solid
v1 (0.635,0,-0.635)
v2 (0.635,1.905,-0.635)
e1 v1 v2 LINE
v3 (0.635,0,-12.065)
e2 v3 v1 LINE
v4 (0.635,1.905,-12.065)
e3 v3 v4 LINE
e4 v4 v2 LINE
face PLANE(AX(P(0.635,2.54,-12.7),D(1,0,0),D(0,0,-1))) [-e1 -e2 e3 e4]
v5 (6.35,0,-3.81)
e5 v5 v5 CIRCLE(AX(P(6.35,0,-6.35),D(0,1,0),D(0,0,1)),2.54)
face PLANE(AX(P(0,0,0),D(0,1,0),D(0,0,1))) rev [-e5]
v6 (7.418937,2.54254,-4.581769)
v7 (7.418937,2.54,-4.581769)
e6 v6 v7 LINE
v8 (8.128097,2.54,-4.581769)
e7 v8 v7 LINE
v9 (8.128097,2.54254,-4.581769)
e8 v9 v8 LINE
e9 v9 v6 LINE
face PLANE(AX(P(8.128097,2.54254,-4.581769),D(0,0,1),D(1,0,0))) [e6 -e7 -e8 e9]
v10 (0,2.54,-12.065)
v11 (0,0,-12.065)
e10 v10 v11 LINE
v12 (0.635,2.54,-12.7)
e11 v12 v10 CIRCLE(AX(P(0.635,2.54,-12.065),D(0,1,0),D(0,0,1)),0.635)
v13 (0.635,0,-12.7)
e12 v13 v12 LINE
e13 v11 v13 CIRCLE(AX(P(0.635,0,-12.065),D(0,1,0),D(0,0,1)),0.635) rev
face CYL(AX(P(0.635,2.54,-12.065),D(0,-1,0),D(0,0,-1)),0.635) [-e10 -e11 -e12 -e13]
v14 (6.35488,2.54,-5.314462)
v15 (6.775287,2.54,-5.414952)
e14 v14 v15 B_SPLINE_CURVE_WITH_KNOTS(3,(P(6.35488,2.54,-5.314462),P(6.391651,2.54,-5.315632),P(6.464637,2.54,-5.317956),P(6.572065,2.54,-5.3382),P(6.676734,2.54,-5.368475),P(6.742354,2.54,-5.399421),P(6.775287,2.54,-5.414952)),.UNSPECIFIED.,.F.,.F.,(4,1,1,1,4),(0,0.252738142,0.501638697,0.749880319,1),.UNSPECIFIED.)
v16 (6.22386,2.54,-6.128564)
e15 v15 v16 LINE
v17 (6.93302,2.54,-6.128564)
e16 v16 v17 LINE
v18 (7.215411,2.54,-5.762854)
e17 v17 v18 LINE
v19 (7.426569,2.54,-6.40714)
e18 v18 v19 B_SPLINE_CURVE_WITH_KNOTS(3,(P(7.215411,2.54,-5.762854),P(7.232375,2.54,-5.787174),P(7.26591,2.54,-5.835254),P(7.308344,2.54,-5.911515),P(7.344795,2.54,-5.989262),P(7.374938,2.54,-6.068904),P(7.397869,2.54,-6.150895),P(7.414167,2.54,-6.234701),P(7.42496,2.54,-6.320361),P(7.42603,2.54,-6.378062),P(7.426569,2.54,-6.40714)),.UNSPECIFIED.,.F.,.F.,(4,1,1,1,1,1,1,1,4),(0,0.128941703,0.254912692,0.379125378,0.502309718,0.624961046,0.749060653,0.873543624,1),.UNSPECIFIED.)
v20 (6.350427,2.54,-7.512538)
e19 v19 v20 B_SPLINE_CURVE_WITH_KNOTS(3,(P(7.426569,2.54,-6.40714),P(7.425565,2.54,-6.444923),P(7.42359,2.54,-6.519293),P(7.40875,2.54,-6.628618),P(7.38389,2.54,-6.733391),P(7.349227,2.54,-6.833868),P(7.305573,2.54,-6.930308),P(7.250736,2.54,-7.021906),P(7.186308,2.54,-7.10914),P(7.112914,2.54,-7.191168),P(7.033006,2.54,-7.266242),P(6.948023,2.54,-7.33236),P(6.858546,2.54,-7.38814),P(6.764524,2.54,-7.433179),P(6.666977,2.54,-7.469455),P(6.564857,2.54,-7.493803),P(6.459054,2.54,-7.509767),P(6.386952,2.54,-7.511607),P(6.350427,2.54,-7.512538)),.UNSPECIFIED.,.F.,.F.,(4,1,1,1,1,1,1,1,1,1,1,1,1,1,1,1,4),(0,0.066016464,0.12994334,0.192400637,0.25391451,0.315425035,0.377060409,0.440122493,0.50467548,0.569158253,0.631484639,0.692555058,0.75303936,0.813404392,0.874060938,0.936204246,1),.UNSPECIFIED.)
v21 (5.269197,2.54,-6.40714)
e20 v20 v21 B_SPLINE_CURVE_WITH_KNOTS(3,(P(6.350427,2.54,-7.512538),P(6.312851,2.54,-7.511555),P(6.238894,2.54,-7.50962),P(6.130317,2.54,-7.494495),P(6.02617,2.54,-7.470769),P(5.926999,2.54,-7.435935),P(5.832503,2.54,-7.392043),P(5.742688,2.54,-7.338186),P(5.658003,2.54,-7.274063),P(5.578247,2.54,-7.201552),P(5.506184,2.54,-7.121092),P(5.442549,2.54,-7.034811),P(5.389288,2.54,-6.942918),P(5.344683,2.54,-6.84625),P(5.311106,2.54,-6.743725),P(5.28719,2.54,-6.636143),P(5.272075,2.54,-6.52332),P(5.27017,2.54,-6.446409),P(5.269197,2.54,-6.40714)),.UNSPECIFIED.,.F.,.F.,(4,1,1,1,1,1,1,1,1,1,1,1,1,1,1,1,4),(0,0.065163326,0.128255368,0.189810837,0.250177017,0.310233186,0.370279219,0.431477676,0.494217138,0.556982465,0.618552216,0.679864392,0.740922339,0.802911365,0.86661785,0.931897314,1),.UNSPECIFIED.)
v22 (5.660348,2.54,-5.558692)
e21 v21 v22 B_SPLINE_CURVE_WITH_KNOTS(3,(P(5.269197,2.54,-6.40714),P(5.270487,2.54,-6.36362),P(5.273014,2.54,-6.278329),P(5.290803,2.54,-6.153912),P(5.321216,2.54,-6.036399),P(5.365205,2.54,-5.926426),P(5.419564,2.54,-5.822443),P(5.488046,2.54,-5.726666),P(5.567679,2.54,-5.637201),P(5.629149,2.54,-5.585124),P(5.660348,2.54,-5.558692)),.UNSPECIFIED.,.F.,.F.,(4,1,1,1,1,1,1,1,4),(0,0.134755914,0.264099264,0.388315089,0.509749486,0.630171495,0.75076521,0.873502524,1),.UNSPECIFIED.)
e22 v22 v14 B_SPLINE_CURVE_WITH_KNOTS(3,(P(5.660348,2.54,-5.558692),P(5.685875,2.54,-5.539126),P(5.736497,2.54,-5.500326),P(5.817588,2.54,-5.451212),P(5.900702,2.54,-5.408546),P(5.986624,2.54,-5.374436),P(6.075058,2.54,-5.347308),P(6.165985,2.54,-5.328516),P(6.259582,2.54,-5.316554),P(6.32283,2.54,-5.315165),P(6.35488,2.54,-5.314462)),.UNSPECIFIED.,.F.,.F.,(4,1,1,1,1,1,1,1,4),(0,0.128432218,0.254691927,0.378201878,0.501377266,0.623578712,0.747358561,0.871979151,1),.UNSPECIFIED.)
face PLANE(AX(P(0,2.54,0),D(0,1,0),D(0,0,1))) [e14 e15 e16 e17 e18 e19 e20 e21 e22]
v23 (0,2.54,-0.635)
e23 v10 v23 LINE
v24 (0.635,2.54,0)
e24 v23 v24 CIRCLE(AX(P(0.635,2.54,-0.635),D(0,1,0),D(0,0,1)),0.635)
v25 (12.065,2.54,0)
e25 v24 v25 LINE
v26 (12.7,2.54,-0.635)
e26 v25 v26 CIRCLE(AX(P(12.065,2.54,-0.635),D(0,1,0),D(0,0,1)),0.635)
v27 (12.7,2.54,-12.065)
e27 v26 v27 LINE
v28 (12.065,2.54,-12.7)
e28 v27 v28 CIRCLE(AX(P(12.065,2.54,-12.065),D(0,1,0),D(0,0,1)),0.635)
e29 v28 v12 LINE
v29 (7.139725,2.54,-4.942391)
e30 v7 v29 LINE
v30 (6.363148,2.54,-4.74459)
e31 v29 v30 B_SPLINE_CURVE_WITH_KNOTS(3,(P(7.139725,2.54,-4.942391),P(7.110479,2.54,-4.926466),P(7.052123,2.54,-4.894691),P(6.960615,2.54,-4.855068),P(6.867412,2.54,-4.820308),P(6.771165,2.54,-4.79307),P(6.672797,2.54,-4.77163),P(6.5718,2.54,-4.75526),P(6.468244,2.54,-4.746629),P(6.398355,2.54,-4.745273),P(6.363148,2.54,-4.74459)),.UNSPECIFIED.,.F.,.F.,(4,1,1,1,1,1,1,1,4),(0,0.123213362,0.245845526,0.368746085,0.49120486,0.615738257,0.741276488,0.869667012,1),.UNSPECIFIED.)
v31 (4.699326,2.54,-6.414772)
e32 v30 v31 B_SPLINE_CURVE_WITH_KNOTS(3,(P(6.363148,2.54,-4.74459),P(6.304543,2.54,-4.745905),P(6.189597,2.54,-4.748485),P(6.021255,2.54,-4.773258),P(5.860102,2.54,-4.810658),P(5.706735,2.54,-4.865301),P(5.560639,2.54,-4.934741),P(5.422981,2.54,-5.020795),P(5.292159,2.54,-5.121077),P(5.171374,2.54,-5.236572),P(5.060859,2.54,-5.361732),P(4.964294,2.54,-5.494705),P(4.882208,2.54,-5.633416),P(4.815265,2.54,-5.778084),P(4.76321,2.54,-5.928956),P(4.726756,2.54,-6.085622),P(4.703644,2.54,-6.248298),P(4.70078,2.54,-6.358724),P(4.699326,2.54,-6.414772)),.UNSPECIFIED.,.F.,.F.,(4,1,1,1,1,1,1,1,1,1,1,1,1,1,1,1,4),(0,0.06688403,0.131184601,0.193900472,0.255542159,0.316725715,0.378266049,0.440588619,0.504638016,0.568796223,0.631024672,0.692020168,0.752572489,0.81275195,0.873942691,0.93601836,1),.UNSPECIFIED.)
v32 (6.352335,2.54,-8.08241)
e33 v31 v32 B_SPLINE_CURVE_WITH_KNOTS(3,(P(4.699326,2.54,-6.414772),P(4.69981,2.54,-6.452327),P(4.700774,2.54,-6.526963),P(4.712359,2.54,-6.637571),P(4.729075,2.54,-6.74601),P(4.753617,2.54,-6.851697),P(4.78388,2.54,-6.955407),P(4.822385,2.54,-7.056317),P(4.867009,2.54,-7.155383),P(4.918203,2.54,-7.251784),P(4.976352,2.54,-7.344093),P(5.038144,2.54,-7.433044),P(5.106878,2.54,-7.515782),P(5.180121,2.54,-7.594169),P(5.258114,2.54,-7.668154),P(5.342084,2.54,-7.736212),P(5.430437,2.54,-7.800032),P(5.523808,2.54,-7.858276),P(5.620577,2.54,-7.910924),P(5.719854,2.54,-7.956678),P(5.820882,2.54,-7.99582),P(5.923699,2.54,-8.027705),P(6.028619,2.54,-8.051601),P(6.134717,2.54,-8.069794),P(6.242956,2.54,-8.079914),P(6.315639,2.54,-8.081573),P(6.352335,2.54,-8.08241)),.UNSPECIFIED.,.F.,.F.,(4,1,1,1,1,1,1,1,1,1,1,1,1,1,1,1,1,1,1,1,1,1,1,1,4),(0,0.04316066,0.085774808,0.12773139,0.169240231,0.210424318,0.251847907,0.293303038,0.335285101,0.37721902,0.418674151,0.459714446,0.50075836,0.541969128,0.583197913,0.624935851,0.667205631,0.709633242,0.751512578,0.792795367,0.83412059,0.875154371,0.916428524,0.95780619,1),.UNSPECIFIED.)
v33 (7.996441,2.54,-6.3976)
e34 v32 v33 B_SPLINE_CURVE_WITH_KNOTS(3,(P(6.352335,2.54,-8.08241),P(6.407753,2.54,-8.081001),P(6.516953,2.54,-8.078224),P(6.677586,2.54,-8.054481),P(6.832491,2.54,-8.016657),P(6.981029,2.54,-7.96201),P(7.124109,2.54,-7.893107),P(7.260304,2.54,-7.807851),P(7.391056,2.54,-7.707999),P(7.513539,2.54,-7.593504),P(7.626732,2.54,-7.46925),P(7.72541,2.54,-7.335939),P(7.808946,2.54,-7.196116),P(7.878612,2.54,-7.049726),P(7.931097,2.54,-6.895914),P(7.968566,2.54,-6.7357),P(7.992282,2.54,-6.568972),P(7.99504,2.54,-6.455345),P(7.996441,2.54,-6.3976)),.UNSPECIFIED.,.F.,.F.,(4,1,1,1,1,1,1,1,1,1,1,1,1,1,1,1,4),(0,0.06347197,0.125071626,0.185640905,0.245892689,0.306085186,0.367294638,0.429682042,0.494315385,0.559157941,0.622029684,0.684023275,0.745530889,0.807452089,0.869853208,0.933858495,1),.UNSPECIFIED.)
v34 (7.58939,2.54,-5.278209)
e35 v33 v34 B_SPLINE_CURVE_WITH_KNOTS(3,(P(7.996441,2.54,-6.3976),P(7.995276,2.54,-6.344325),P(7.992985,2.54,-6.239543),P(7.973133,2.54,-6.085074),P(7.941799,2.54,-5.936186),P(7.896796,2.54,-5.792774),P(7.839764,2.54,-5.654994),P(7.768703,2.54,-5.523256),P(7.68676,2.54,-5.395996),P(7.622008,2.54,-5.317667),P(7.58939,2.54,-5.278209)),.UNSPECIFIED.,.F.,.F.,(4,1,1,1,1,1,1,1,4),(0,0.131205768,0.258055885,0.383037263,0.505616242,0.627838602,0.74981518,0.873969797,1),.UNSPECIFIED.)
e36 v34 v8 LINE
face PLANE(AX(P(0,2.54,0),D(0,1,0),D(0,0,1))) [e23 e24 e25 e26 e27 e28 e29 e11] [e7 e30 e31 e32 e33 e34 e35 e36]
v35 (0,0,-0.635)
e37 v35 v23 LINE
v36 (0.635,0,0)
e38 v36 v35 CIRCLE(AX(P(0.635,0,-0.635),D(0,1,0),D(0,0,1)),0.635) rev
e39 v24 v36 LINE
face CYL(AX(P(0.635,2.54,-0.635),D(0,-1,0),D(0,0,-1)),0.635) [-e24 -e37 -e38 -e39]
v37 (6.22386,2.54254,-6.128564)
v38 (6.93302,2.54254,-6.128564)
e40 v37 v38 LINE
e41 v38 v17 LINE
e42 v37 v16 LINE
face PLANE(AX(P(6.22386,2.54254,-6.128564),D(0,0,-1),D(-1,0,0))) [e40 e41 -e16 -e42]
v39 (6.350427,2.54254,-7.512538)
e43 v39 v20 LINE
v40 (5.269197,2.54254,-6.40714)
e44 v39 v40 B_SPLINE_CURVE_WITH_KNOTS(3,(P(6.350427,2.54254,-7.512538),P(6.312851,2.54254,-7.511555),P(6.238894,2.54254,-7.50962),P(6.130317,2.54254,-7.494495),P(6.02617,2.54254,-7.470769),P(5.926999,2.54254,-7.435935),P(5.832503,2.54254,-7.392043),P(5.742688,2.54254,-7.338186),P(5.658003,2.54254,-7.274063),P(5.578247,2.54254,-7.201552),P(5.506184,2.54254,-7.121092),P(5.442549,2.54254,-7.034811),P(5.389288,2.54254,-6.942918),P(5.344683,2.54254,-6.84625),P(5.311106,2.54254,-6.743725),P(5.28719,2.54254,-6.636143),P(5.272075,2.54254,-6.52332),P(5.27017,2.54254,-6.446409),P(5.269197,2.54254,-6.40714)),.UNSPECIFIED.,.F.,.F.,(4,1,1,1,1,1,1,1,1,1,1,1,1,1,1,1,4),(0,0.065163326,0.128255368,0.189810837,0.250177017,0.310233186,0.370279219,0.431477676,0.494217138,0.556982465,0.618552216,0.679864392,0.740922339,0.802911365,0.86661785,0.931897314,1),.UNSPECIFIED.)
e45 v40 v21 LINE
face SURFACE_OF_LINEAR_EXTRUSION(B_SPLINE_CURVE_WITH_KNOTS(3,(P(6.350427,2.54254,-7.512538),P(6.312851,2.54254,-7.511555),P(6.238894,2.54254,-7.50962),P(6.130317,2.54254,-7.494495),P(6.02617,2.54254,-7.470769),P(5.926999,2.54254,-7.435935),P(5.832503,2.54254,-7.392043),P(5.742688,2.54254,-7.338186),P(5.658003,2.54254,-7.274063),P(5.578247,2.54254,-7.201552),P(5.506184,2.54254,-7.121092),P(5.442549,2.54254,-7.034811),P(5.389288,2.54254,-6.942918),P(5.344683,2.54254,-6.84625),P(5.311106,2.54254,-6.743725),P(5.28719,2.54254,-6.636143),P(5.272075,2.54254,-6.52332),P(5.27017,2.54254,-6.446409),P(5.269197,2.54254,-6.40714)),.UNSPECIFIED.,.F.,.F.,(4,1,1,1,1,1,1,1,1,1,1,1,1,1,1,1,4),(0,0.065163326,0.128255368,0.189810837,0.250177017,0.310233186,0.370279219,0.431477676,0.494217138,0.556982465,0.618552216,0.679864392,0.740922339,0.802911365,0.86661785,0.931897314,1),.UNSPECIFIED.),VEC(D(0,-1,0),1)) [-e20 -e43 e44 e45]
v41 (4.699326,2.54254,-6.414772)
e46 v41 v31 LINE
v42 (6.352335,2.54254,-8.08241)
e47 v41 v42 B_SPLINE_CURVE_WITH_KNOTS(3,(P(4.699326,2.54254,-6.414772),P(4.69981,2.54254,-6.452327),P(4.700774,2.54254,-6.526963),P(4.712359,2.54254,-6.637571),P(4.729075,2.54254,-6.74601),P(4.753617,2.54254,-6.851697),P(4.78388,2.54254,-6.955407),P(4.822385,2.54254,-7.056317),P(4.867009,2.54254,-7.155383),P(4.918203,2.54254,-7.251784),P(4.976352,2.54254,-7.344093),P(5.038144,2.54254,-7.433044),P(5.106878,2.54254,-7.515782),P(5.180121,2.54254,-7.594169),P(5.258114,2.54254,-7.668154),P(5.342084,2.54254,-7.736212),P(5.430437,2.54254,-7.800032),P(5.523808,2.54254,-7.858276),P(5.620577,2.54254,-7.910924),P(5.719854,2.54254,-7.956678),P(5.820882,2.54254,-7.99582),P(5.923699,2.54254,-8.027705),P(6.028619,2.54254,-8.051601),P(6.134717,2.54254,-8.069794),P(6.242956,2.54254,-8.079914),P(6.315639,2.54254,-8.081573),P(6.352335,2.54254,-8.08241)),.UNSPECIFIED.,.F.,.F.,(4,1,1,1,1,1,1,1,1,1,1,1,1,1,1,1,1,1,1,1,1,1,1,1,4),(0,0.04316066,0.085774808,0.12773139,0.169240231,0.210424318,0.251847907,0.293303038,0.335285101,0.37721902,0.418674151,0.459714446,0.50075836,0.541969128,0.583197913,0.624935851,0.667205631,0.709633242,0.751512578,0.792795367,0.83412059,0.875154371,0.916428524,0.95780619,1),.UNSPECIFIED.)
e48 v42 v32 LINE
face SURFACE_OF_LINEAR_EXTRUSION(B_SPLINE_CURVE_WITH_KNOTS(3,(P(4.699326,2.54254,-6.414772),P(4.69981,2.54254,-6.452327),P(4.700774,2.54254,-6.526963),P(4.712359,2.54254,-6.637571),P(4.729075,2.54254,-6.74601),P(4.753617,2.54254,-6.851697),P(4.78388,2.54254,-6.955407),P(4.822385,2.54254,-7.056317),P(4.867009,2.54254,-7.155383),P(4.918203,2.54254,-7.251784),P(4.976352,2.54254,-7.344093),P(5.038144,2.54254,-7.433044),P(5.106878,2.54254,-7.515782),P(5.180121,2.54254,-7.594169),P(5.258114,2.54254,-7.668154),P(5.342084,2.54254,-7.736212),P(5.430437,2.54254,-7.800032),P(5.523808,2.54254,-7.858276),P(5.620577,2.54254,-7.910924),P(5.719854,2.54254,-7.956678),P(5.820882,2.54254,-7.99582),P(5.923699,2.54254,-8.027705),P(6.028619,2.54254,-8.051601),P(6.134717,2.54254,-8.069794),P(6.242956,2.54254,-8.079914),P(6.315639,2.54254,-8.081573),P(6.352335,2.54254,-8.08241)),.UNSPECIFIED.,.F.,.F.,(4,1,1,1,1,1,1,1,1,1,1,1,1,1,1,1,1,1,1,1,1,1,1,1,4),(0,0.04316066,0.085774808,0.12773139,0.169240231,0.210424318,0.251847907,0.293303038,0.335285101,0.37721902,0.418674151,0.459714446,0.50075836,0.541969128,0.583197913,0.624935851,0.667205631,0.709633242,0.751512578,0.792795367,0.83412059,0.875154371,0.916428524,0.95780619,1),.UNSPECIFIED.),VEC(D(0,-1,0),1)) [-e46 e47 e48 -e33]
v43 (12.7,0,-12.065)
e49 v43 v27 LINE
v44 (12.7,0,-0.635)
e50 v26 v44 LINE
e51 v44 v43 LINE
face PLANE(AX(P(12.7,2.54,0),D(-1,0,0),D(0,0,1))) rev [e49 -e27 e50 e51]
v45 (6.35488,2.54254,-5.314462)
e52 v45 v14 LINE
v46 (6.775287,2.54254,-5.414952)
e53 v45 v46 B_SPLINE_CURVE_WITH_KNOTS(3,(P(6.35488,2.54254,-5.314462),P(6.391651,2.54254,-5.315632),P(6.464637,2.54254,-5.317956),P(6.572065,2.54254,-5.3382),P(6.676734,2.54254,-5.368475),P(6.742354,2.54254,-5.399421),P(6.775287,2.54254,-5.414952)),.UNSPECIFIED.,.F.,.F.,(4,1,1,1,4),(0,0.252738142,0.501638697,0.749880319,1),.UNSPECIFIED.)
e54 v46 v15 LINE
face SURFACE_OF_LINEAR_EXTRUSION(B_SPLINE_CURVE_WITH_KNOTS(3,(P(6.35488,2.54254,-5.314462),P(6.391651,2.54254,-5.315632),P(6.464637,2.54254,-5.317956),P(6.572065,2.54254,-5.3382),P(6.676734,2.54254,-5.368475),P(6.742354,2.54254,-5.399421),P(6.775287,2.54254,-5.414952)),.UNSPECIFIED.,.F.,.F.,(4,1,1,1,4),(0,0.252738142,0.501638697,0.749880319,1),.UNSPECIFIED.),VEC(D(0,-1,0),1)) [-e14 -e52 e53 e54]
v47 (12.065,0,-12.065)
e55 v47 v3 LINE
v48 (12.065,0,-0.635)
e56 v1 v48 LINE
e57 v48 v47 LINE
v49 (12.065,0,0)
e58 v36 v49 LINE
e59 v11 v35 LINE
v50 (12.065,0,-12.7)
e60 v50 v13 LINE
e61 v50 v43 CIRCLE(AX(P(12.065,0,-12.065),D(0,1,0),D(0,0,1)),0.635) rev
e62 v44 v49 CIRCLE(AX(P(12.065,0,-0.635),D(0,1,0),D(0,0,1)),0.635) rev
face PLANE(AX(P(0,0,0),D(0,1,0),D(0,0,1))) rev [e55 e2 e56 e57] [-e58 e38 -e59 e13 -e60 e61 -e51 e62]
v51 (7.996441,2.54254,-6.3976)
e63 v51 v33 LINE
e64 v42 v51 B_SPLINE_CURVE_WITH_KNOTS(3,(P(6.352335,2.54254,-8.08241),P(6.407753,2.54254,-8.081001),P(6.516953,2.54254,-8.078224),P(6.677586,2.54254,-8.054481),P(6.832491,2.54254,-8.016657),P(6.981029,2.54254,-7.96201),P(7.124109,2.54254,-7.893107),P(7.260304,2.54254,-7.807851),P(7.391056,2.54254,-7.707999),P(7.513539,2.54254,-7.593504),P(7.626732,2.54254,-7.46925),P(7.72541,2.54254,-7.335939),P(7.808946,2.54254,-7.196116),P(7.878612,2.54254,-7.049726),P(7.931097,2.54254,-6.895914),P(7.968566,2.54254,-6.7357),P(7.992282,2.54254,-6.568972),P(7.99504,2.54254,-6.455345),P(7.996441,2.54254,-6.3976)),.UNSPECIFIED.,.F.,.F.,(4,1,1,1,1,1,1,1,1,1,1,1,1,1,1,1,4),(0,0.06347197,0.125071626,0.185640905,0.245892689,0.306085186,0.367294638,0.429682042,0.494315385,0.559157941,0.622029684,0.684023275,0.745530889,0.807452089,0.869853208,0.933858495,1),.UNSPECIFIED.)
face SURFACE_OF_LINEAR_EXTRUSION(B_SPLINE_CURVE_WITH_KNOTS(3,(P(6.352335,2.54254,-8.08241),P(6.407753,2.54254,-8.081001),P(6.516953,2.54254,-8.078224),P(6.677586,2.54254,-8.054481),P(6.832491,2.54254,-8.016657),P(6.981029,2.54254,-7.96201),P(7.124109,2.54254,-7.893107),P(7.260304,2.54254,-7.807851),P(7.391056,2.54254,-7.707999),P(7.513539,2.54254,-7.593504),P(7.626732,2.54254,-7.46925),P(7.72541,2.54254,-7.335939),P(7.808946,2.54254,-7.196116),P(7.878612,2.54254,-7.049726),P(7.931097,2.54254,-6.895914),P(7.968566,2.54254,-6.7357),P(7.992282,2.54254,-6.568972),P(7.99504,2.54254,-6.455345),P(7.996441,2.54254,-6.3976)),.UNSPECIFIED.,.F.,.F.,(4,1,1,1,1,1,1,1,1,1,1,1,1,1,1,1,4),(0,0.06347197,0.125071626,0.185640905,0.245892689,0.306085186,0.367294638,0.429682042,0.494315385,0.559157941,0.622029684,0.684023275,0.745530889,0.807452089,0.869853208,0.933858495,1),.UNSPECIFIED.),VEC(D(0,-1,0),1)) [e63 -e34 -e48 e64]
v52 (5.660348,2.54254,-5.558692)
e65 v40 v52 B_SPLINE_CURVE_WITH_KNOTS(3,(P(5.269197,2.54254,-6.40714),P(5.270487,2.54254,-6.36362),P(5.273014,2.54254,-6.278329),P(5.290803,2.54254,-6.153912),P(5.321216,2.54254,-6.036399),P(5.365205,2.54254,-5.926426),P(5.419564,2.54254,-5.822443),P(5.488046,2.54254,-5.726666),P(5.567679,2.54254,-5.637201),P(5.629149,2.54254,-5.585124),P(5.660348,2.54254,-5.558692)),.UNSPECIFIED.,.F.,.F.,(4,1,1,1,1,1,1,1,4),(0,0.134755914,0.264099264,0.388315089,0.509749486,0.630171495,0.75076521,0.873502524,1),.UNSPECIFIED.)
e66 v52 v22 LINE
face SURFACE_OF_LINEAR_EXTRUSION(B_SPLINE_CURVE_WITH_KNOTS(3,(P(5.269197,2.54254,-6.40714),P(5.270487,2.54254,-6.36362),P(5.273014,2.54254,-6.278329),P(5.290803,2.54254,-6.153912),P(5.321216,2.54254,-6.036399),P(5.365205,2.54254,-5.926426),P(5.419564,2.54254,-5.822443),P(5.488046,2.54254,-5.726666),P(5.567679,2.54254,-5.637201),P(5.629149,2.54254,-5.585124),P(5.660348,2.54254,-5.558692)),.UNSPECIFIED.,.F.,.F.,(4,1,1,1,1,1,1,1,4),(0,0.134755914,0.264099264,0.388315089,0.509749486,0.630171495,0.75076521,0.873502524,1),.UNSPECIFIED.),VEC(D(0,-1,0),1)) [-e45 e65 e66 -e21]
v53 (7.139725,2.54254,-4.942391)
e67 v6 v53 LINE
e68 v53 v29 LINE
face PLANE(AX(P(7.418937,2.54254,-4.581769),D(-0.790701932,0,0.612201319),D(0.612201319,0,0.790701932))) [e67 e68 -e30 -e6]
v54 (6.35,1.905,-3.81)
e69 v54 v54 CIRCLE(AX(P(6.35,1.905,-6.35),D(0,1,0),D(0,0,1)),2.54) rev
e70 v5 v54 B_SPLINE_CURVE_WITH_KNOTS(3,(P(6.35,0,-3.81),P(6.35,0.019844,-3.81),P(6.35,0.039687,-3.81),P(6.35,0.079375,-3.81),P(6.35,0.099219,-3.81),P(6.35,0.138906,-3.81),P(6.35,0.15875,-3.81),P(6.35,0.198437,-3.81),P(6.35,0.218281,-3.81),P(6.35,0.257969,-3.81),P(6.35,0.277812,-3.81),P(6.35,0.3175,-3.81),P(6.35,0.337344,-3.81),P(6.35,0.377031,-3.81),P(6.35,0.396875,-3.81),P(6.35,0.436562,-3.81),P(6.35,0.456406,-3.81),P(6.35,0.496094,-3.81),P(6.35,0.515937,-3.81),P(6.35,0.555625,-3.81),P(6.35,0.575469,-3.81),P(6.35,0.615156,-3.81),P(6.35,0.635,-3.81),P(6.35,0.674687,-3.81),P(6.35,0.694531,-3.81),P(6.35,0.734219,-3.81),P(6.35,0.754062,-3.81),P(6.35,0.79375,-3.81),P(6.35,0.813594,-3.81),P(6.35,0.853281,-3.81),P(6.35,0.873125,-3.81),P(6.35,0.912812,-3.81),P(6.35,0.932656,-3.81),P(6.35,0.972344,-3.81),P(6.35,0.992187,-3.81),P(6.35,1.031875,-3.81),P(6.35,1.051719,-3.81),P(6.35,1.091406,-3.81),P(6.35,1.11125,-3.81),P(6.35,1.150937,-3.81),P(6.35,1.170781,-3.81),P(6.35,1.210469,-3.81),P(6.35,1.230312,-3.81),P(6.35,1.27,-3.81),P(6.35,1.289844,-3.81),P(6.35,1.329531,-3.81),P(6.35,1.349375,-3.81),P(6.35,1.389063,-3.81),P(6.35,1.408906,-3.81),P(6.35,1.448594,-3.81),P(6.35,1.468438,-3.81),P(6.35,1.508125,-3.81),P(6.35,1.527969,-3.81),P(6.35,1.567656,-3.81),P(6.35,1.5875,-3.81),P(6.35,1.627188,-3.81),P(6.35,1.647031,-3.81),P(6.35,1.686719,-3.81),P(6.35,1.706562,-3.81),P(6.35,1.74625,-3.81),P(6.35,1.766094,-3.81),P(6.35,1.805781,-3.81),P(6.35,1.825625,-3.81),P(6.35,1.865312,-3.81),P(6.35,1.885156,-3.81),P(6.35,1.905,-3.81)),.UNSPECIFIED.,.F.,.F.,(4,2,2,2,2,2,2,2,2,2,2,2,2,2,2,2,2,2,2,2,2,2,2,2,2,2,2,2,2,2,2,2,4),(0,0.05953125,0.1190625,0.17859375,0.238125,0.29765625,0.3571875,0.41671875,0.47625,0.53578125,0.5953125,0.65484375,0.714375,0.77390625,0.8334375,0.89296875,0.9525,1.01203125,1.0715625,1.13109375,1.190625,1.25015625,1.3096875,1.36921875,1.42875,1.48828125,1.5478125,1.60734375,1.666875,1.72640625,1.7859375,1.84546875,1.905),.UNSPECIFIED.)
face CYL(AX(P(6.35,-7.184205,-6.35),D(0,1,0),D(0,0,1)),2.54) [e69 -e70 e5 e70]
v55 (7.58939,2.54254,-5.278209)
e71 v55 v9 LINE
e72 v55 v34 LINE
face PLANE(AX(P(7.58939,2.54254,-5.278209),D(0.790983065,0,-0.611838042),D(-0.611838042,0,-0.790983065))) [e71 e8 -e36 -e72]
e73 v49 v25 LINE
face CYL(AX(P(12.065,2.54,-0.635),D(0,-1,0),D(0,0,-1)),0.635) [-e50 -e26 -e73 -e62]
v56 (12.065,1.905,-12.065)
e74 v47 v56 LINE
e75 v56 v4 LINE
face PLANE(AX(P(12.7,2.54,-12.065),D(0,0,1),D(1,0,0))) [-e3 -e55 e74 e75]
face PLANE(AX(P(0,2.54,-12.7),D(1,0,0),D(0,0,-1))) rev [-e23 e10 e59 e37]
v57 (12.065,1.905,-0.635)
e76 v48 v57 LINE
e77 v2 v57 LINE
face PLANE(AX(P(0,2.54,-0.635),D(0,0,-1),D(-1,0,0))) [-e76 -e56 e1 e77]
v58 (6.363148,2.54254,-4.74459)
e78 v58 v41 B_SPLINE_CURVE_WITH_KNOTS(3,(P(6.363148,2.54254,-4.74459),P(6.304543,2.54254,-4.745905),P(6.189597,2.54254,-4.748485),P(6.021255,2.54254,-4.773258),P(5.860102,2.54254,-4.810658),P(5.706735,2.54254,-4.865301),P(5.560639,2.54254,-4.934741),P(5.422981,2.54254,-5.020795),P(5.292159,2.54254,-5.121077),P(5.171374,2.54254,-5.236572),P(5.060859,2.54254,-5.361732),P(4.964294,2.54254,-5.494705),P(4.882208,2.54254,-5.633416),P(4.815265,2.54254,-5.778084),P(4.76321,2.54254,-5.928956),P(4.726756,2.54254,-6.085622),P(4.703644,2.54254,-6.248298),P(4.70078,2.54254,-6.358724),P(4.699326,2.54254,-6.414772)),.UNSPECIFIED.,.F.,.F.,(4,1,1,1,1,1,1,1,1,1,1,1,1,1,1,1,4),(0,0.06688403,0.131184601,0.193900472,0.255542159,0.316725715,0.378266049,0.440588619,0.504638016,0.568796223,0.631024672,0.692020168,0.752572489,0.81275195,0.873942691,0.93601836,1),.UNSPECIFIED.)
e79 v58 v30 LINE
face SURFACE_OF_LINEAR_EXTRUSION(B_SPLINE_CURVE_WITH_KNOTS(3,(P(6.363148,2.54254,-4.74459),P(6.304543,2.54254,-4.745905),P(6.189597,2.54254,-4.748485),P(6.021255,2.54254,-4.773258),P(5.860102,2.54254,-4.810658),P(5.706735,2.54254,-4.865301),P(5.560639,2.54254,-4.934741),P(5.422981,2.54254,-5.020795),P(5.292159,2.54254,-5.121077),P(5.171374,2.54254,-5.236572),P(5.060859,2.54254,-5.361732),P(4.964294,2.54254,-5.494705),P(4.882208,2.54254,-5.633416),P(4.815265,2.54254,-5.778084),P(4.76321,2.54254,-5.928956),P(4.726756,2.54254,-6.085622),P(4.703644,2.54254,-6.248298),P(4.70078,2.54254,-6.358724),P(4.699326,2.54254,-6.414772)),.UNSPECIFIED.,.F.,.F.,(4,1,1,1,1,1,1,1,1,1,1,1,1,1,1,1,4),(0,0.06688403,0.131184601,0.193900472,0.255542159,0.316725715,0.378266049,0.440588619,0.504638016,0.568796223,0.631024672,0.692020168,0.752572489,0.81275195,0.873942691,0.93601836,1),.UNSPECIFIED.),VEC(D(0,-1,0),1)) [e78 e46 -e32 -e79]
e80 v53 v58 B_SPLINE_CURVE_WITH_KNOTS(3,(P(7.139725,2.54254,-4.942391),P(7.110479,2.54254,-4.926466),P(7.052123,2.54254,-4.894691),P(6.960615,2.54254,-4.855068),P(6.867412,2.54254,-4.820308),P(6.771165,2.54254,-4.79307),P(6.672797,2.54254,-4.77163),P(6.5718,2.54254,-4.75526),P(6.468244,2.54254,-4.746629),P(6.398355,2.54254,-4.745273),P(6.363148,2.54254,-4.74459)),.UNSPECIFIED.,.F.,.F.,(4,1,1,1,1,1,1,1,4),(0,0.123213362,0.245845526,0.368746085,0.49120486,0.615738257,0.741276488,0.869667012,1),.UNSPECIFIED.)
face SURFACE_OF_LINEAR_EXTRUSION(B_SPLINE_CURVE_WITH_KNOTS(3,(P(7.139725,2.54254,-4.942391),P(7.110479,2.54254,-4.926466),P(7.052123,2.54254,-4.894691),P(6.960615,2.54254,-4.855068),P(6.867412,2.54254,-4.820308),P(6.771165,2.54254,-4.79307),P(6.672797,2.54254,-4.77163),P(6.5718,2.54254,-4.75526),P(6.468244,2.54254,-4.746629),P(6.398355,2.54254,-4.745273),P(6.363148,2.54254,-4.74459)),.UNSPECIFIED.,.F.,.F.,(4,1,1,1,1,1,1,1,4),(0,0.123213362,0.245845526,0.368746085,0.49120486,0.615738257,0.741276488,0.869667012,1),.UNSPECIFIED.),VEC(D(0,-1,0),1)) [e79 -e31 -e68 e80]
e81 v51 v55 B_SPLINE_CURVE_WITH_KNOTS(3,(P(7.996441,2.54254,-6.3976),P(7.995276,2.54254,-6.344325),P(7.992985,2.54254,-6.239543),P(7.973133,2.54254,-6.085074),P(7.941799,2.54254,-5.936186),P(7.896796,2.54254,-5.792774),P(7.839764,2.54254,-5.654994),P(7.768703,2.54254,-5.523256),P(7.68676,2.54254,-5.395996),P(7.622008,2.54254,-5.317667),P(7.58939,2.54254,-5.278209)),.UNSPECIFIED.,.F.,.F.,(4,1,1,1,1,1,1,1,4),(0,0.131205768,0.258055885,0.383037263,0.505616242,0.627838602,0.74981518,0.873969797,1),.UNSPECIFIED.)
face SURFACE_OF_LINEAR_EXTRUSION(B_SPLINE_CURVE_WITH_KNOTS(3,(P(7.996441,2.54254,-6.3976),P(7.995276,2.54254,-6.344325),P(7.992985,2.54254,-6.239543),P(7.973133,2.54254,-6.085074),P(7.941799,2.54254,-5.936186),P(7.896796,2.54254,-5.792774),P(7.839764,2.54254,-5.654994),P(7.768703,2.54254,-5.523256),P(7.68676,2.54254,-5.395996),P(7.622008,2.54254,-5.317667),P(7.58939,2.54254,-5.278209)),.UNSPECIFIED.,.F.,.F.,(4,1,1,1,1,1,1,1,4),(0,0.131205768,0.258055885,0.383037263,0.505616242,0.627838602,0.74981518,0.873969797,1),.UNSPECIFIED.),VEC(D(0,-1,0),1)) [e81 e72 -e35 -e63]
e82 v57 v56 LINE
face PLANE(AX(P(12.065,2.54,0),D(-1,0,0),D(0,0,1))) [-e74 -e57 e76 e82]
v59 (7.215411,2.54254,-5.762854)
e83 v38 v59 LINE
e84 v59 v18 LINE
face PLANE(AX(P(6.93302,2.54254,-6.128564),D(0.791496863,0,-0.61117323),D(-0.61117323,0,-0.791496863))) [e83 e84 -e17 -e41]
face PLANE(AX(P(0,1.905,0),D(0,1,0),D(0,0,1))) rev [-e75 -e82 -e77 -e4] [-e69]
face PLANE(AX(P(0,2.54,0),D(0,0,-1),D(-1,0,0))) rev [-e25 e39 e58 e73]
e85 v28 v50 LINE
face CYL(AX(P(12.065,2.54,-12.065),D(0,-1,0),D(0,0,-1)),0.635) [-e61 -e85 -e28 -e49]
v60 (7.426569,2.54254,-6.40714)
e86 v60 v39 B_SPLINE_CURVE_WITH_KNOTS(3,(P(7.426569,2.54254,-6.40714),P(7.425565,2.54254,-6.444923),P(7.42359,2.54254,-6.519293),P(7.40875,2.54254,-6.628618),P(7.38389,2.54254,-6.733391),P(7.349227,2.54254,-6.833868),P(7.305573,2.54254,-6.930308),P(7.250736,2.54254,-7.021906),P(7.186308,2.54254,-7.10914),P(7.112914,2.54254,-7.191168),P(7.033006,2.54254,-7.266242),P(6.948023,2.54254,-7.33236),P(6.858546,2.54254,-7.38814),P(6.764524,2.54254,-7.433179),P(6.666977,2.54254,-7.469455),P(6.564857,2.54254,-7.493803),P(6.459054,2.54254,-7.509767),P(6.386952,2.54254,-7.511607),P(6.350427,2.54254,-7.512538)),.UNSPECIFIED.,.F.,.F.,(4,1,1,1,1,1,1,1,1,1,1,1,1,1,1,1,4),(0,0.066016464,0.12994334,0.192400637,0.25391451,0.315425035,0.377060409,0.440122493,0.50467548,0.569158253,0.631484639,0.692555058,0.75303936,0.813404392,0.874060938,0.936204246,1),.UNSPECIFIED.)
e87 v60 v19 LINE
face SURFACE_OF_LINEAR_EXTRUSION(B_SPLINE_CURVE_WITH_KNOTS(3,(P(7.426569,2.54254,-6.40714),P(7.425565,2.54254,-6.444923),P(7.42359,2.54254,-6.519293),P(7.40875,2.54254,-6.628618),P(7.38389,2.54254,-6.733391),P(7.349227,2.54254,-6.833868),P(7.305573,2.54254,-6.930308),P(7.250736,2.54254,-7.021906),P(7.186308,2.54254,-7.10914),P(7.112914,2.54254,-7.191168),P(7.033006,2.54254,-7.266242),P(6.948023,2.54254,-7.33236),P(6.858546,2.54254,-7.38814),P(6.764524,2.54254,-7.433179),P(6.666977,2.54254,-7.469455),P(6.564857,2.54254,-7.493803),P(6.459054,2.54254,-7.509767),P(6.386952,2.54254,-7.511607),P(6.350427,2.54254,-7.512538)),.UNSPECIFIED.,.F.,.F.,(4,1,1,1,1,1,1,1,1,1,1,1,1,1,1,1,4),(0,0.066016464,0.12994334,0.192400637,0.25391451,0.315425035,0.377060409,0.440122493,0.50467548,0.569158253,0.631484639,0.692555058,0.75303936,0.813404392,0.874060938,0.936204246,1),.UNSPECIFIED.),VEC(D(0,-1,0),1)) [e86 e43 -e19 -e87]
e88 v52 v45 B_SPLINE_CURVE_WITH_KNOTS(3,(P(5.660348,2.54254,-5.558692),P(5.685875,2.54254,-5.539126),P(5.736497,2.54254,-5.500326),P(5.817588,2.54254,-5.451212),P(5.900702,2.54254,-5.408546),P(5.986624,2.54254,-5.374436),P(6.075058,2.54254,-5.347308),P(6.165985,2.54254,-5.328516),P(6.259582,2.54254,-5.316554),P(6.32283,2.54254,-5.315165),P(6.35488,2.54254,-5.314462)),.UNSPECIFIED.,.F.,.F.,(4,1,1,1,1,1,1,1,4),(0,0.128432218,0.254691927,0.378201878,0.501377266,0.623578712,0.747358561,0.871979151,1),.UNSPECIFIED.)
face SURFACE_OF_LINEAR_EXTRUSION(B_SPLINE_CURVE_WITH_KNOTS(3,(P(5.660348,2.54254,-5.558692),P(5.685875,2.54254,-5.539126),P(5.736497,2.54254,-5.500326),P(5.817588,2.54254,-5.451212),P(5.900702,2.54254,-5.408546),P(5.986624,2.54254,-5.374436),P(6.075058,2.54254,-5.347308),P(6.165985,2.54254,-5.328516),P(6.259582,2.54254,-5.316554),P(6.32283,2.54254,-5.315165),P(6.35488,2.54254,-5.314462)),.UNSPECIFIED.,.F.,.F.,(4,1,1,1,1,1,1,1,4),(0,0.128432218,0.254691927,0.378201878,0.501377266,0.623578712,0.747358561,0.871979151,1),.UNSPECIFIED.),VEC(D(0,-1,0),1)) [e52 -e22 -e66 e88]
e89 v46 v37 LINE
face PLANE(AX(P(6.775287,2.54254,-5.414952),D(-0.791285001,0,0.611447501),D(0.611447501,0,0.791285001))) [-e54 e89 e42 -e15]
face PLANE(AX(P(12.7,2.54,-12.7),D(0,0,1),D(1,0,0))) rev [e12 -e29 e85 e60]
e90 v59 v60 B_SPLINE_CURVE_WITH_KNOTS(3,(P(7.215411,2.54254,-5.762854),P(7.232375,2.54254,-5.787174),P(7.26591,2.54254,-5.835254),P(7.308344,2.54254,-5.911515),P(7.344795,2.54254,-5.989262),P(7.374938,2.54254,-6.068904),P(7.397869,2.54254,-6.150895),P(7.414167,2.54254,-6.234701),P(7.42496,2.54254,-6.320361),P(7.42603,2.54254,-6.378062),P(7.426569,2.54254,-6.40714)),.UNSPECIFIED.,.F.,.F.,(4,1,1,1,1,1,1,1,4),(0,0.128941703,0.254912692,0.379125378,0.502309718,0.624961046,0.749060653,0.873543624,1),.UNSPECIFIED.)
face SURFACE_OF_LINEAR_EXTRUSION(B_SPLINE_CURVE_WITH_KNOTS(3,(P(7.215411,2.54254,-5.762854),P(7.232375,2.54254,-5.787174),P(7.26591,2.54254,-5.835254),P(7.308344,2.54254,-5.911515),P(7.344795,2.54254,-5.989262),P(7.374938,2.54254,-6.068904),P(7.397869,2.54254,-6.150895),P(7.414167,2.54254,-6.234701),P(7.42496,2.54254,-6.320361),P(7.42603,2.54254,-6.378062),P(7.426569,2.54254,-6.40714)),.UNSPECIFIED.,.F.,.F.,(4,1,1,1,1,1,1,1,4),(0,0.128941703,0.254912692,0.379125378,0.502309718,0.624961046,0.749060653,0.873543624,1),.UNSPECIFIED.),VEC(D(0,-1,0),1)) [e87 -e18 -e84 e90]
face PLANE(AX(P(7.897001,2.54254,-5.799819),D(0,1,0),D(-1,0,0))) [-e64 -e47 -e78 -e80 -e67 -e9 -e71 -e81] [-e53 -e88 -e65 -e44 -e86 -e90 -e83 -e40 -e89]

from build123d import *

# Parameters (mm, degrees)
SKETCH1_W           = 12.7
SKETCH1_H           = 12.7
BOSS_EXTRUDE1_DEPTH = 2.54
FILLET1_R           = 0.635
SHELL1_START        = 0.635
SHELL1_OUTLINE_W    = 1.905
SHELL1_OUTLINE_H    = 11.43
SHELL1_DEPTH        = 11.43
SKETCH2_R           = 2.54
BOSS_EXTRUDE2_DEPTH = 1.905
BOSS_EXTRUDE3_DEPTH = 0.00254


# Read off the part's stored shape, not the designer's step: Shell1
with BuildPart() as part:
    # Sketch1 → Boss-Extrude1 (new body)
    with BuildSketch(Plane(origin=(0, 0, 0), x_dir=(1, 0, 0), z_dir=(0, 1, 0))):
        with Locations((6.35, 6.35)):
            Rectangle(SKETCH1_W, SKETCH1_H)
    extrude(amount=BOSS_EXTRUDE1_DEPTH)

    # Fillet1
    fillet1_edges = [part.edges().sort_by_distance(p)[0] for p in [
        (0, 1.27, -12.7),
        (12.7, 1.27, -12.7),
        (12.7, 1.27, 0),
        (0, 1.27, 0),
    ]]
    fillet(fillet1_edges, radius=FILLET1_R)

    # Shell1 outline → Shell1 (cut)
    with BuildSketch(Plane.YZ.offset(SHELL1_START)):
        with Locations((0.9525, -6.35)):
            Rectangle(SHELL1_OUTLINE_W, SHELL1_OUTLINE_H)
    extrude(amount=SHELL1_DEPTH, mode=Mode.SUBTRACT)

    # Sketch2 → Boss-Extrude2 (add)
    with BuildSketch(Plane(origin=(0, 1.905, 0), x_dir=(-1, 0, 0), z_dir=(0, -1, 0))):
        with Locations(Location((-6.35, 6.35, 0), (0, 0, 270))):
            Circle(SKETCH2_R)
    extrude(amount=BOSS_EXTRUDE2_DEPTH)

    # Sketch3 → Boss-Extrude3 (add)
    with BuildSketch(Plane(origin=(0, 2.54, 0), x_dir=(1, 0, 0), z_dir=(0, 1, 0))):
        with BuildLine():
            Line((7.589389744, 5.278208534), (8.128096675, 4.581769231))
            Line((8.128096675, 4.581769231), (7.418937019, 4.581769231))
            Line((7.418937019, 4.581769231), (7.13972528, 4.942391226))
            add(Edge.make_bspline(
                [(7.13972528, 4.942391226), (7.110478697, 4.926466187), (7.052123488, 4.894691228), (6.960614822, 4.855068108), (6.867412166, 4.820307815), (6.771164987, 4.793069664), (6.672797341, 4.771629932), (6.571799543, 4.755260346), (6.468243861, 4.746629027), (6.398354698, 4.745272899), (6.363147756, 4.744589744)],
                knots=[0, 0, 0, 0, 0.985706899, 1.966764212, 2.949968678, 3.929638882, 4.925906056, 5.930211904, 6.957336097, 8, 8, 8, 8], degree=3))
            add(Edge.make_bspline(
                [(6.363147756, 4.744589744), (6.304542849, 4.745905131), (6.189596707, 4.748485098), (6.021255045, 4.773257837), (5.86010189, 4.81065794), (5.706735433, 4.865301405), (5.560639002, 4.93474107), (5.422980515, 5.020794933), (5.292158769, 5.121077116), (5.171374474, 5.236571809), (5.060858729, 5.361731796), (4.96429439, 5.49470483), (4.88220836, 5.633416247), (4.815264882, 5.778083639), (4.763209523, 5.928956411), (4.726755567, 6.085622481), (4.703644343, 6.248298361), (4.700779646, 6.358724268), (4.699325641, 6.414772035)],
                knots=[0, 0, 0, 0, 1.070144486, 2.098953612, 3.10240755, 4.088674545, 5.067611437, 6.052256776, 7.0494179, 8.074208254, 9.100739571, 10.09639475, 11.072322686, 12.041159829, 13.004031207, 13.983083054, 14.976293755, 16, 16, 16, 16], degree=3))
            add(Edge.make_bspline(
                [(4.699325641, 6.414772035), (4.69981035, 6.452327381), (4.700773631, 6.526962536), (4.712359176, 6.637570612), (4.729074707, 6.74600964), (4.753617357, 6.851696745), (4.783880127, 6.95540729), (4.822385353, 7.056316673), (4.867009306, 7.15538311), (4.918202859, 7.251783598), (4.976351833, 7.344092805), (5.03814397, 7.433044208), (5.106877934, 7.51578176), (5.18012093, 7.594168735), (5.258113534, 7.668153791), (5.342084012, 7.736211938), (5.430436693, 7.800032133), (5.523808175, 7.858276403), (5.6205775, 7.910923569), (5.719854021, 7.956677527), (5.820882117, 7.995819583), (5.923699482, 8.027705354), (6.028618864, 8.051600525), (6.134717058, 8.0697941), (6.242956128, 8.079914479), (6.315639078, 8.081572932), (6.352335457, 8.082410256)],
                knots=[0, 0, 0, 0, 1.035855852, 2.058595393, 3.065553363, 4.06176554, 5.050183643, 6.044349766, 7.039272903, 8.046842428, 9.053256483, 10.04817962, 11.033146707, 12.018200652, 13.007259073, 13.996749908, 14.99846043, 16.012935138, 17.03119782, 18.036301871, 19.027088812, 20.018894167, 21.003704893, 21.994284571, 22.987348552, 24, 24, 24, 24], degree=3))
            add(Edge.make_bspline(
                [(6.352335457, 8.082410256), (6.407752886, 8.081001093), (6.516953024, 8.078224334), (6.677585719, 8.054480547), (6.832490656, 8.016657267), (6.981029087, 7.962010037), (7.12410888, 7.893107178), (7.260304055, 7.807850891), (7.391055808, 7.707999288), (7.513539447, 7.593504419), (7.626732359, 7.469249914), (7.725409869, 7.33593868), (7.808946318, 7.196116061), (7.878612035, 7.049726313), (7.931097461, 6.895913898), (7.968565757, 6.735700032), (7.992282098, 6.568971999), (7.995039629, 6.455345392), (7.996441026, 6.397599559)],
                knots=[0, 0, 0, 0, 1.015551519, 2.00114601, 2.970254478, 3.93428303, 4.897362978, 5.876714212, 6.874912676, 7.909046156, 8.946527051, 9.952474942, 10.9443724, 11.928494229, 12.919233427, 13.917651329, 14.941735923, 16, 16, 16, 16], degree=3))
            add(Edge.make_bspline(
                [(7.996441026, 6.397599559), (7.995275963, 6.344324576), (7.992984514, 6.239543185), (7.973133051, 6.085073676), (7.941799009, 5.93618576), (7.89679568, 5.792773627), (7.839764108, 5.654993593), (7.768702598, 5.523255836), (7.686759711, 5.39599636), (7.622008209, 5.317666883), (7.589389744, 5.278208534)],
                knots=[0, 0, 0, 0, 1.049646143, 2.064447078, 3.064298101, 4.044929938, 5.022708814, 5.998521441, 6.991758374, 8, 8, 8, 8], degree=3))
        make_face()
        with BuildLine():
            add(Edge.make_bspline(
                [(7.215411378, 5.762853966), (7.232374671, 5.787174078), (7.265910436, 5.835253985), (7.308344006, 5.911515257), (7.344794922, 5.989262448), (7.374938402, 6.068903528), (7.397868514, 6.150894907), (7.414166719, 6.234701319), (7.424959684, 6.320361144), (7.42602991, 6.378062342), (7.426569231, 6.407139824)],
                knots=[0, 0, 0, 0, 1.031533623, 2.039301536, 3.033003023, 4.018477747, 4.999688364, 5.992485227, 6.988348989, 8, 8, 8, 8], degree=3))
            add(Edge.make_bspline(
                [(7.426569231, 6.407139824), (7.425565467, 6.44492283), (7.423589712, 6.519292914), (7.408750209, 6.628618034), (7.383890189, 6.733390986), (7.349226622, 6.833868214), (7.305573348, 6.930307641), (7.250735612, 7.021906242), (7.186308475, 7.109139766), (7.112913869, 7.191168117), (7.03300641, 7.266242217), (6.948022887, 7.332360438), (6.858546258, 7.388140444), (6.764524178, 7.433179158), (6.666976563, 7.469454645), (6.564856578, 7.493802938), (6.459054311, 7.50976733), (6.386951725, 7.511606706), (6.350427404, 7.512538462)],
                knots=[0, 0, 0, 0, 1.056263418, 2.079093448, 3.078410197, 4.062632158, 5.04680056, 6.032966551, 7.041959893, 8.074807684, 9.106532056, 10.103754224, 11.080880922, 12.048629763, 13.014470275, 13.984975, 14.979267944, 16, 16, 16, 16], degree=3))
            add(Edge.make_bspline(
                [(6.350427404, 7.512538462), (6.312851373, 7.511555352), (6.238893703, 7.509620382), (6.130317465, 7.494494694), (6.026169919, 7.470769489), (5.926998511, 7.435934883), (5.832502968, 7.392042518), (5.742687623, 7.338185734), (5.658002596, 7.274062961), (5.578246545, 7.201552409), (5.506184165, 7.121091877), (5.442548821, 7.034811209), (5.38928769, 6.942918458), (5.344683443, 6.846250439), (5.311105764, 6.743724644), (5.287189539, 6.636142959), (5.272075339, 6.523320349), (5.270170179, 6.446409309), (5.269197436, 6.407139824)],
                knots=[0, 0, 0, 0, 1.042613217, 2.052085894, 3.036973397, 4.002832266, 4.963730975, 5.924467509, 6.903642813, 7.907474205, 8.911719447, 9.896835452, 10.877830278, 11.85475743, 12.846581833, 13.865885605, 14.910357018, 16, 16, 16, 16], degree=3))
            add(Edge.make_bspline(
                [(5.269197436, 6.407139824), (5.270486861, 6.363620201), (5.273013922, 6.278328951), (5.290802543, 6.153911765), (5.321215888, 6.036399284), (5.365204909, 5.926425933), (5.419563509, 5.822443324), (5.488046054, 5.726666097), (5.567678666, 5.637200516), (5.629149275, 5.585123602), (5.660348277, 5.558692308)],
                knots=[0, 0, 0, 0, 1.078047314, 2.112794111, 3.106520711, 4.077995885, 5.041371964, 6.006121678, 6.988020189, 8, 8, 8, 8], degree=3))
            add(Edge.make_bspline(
                [(5.660348277, 5.558692308), (5.685874998, 5.539126434), (5.73649664, 5.500325655), (5.817588059, 5.451211693), (5.900701996, 5.408546176), (5.986624335, 5.374435559), (6.075058256, 5.347307518), (6.165984953, 5.328515818), (6.259582038, 5.316554097), (6.32282995, 5.315165288), (6.354879527, 5.314461538)],
                knots=[0, 0, 0, 0, 1.027457745, 2.037535419, 3.025615023, 4.011018129, 4.9886297, 5.978868484, 6.975833209, 8, 8, 8, 8], degree=3))
            add(Edge.make_bspline(
                [(6.354879527, 5.314461538), (6.391651355, 5.315632394), (6.464636665, 5.317956327), (6.57206456, 5.338199851), (6.676734184, 5.368474506), (6.742353753, 5.399420844), (6.775287179, 5.414952324)],
                knots=[0, 0, 0, 0, 1.010952568, 2.006554787, 2.999521277, 4, 4, 4, 4], degree=3))
            Line((6.775287179, 5.414952324), (6.223859896, 6.128564103))
            Line((6.223859896, 6.128564103), (6.933019551, 6.128564103))
            Line((6.933019551, 6.128564103), (7.215411378, 5.762853966))
        make_face(mode=Mode.SUBTRACT)
    extrude(amount=BOSS_EXTRUDE3_DEPTH)


solid = part.part
